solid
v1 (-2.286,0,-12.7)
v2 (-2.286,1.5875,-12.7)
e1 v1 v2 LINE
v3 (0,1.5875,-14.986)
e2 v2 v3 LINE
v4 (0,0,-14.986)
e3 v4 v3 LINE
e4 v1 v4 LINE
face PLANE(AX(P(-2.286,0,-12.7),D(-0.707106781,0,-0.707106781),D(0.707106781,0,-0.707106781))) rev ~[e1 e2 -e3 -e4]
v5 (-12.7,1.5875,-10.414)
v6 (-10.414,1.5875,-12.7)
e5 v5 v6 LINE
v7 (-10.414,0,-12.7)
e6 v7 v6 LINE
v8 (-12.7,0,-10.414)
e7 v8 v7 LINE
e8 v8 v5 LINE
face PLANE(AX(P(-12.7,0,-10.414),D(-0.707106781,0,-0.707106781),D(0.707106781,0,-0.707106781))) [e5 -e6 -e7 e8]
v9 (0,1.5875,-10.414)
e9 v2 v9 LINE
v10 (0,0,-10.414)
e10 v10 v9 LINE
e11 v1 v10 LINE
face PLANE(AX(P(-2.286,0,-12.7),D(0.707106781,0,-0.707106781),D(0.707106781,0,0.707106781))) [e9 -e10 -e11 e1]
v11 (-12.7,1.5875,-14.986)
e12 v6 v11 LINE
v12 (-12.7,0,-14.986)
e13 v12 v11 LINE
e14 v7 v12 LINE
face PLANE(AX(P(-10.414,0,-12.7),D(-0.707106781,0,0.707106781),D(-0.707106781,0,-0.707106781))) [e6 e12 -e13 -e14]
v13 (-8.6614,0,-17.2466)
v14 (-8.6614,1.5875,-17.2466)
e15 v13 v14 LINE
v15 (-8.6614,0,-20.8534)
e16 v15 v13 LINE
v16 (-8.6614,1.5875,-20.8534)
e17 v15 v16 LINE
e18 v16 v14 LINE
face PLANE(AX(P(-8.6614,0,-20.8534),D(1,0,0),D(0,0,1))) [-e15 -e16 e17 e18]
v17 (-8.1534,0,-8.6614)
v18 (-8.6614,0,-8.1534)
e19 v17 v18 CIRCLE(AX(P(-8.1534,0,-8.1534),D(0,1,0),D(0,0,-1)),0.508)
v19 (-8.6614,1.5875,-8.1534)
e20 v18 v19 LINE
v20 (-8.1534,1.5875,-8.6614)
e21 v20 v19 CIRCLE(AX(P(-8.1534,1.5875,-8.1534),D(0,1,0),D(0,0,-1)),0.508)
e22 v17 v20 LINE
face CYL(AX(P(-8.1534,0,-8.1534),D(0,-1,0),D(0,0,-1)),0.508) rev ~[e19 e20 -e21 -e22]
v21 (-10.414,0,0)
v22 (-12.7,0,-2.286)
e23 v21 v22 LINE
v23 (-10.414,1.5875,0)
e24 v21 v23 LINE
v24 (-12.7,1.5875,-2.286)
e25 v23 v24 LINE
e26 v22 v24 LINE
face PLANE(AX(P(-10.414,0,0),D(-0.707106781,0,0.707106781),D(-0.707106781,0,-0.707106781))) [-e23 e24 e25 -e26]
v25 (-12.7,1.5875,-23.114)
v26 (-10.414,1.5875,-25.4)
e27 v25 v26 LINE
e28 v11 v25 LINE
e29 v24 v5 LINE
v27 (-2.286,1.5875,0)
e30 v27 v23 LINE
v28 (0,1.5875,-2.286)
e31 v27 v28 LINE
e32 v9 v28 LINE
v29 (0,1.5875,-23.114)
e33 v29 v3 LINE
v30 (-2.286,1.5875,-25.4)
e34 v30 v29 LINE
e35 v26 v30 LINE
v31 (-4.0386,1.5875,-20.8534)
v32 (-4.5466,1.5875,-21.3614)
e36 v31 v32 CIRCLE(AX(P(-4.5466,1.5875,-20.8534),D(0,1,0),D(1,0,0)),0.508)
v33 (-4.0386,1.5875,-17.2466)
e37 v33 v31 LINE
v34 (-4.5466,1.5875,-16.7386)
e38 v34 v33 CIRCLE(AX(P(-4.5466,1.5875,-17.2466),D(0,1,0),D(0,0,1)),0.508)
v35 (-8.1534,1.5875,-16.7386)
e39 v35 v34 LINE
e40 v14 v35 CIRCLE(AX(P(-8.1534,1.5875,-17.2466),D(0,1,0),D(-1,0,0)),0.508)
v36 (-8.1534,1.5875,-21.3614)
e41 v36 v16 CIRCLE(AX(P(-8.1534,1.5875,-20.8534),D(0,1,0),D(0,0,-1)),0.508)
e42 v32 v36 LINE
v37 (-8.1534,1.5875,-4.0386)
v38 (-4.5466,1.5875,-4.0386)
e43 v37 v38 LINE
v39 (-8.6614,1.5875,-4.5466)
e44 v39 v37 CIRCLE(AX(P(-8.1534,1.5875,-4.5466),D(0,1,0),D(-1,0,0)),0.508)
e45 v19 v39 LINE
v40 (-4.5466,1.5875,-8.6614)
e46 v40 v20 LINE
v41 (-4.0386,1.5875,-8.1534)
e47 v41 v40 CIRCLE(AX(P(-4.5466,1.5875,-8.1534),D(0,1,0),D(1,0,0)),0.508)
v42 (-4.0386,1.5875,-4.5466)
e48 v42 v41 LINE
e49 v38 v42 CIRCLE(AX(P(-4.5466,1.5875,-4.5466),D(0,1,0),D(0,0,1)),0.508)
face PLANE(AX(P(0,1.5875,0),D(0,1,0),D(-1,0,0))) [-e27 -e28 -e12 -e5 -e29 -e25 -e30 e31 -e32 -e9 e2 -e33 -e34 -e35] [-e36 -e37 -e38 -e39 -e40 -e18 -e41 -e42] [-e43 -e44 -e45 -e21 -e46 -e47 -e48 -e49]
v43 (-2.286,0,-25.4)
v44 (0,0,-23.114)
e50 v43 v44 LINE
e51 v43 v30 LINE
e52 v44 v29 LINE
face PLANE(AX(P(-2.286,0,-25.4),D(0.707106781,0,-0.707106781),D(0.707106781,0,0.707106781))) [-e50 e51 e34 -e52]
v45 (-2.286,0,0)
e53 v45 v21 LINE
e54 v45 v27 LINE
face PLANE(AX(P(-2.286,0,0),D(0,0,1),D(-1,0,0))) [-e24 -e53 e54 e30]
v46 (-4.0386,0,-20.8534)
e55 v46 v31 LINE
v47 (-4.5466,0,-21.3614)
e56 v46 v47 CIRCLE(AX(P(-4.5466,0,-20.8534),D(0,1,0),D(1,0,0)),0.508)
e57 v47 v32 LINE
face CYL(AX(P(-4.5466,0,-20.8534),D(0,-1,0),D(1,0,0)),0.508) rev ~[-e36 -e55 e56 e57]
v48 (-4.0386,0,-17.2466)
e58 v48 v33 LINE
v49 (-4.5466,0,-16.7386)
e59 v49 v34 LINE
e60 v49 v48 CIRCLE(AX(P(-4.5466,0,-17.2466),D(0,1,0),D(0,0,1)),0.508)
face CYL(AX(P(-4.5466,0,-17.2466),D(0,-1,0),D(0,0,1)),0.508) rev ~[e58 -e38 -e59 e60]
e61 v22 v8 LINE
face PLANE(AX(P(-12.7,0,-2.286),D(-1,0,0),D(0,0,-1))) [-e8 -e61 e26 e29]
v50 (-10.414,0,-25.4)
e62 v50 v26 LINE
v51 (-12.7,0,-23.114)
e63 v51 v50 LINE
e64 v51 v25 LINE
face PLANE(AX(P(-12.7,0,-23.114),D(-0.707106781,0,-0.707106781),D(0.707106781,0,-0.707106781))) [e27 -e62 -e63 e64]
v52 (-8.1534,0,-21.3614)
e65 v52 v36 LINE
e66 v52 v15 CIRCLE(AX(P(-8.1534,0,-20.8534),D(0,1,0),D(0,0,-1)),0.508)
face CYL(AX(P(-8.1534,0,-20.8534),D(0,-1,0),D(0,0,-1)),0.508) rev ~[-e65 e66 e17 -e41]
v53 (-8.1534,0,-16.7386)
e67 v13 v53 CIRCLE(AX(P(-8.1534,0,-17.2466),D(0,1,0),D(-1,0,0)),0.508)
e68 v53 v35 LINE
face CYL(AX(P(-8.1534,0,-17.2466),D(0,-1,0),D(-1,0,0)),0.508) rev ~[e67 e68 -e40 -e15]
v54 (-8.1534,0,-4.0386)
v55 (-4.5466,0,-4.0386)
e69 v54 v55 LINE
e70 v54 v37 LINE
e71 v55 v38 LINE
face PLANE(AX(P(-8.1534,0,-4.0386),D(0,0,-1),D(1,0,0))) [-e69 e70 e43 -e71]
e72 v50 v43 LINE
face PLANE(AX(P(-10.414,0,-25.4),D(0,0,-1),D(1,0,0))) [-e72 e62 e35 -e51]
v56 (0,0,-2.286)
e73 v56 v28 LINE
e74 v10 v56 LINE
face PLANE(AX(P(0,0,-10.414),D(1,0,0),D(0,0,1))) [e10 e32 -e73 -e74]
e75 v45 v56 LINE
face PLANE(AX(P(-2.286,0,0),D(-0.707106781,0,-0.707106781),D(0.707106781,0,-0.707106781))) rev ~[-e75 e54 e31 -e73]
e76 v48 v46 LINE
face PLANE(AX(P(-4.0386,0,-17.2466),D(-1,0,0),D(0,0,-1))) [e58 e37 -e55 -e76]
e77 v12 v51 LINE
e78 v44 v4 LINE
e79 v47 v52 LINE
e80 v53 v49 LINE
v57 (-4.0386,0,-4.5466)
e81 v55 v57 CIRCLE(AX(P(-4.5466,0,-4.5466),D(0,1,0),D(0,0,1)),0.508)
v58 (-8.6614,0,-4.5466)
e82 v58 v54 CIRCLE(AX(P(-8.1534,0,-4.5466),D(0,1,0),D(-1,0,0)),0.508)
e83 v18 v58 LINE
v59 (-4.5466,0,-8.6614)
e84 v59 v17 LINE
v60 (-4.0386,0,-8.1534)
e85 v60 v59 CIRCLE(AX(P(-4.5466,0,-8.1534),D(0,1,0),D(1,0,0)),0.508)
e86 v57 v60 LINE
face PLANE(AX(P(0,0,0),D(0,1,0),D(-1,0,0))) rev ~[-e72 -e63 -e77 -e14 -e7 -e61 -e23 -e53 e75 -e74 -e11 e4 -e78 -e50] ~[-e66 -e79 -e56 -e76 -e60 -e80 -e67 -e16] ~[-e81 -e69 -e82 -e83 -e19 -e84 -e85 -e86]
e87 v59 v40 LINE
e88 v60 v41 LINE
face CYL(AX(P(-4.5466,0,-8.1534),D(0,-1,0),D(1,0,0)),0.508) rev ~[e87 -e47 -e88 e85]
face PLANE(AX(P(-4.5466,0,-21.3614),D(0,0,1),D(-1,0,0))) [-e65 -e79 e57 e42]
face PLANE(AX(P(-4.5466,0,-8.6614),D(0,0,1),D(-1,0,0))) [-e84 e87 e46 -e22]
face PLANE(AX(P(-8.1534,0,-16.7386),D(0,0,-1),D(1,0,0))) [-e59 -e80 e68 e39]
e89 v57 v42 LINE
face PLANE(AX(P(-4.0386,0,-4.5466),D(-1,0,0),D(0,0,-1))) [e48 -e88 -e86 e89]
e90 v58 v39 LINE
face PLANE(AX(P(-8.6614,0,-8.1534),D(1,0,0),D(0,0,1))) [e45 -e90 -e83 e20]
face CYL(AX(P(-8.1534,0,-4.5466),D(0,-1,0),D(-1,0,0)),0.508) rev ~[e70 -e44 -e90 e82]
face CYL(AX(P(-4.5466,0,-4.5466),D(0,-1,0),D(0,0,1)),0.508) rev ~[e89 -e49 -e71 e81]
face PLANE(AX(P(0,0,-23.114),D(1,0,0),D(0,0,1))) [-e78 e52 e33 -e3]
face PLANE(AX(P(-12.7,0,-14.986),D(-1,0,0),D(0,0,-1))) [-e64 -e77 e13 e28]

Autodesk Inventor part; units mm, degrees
ref_plane "YZ Plane" through (0, 0, 0) normal (1, 0, 0) x (0, 1, 0)
ref_plane "XZ Plane" through (0, 0, 0) normal (0, 1, 0) x (-1, 0, 0)
ref_plane "XY Plane" through (0, 0, 0) normal (0, 0, 1) x (1, 0, 0)
sketch "Sketch1" plane through (0, 0, 0) normal (0, 1, 0) x (-1, 0, 0)
  line L0 (2.286, 0) -> (10.414, 0)
  line L1 (12.7, -2.286) -> (12.7, -10.414)
  line L2 (10.414, -12.7) -> (2.286, -12.7)
  line L3 (0, -10.414) -> (0, -2.286)
  line L4 (8.1534, -4.0386) -> (4.5466, -4.0386)
  line L5 (4.0386, -4.5466) -> (4.0386, -8.1534)
  line L6 (4.5466, -8.6614) -> (8.1534, -8.6614)
  line L7 (8.6614, -8.1534) -> (8.6614, -4.5466)
  line L8 (10.414, 0) -> (12.7, -2.286)
  line L9 (12.7, -10.414) -> (10.414, -12.7)
  line L10 (2.286, -12.7) -> (0, -10.414)
  line L11 (2.286, 0) -> (0, -2.286)
  arc A0 (8.6614, -4.5466) -> (8.1534, -4.0386) centre (8.1534, -4.5466) ccw
  arc A1 (8.1534, -8.6614) -> (8.6614, -8.1534) centre (8.1534, -8.1534) ccw
  arc A2 (4.0386, -8.1534) -> (4.5466, -8.6614) centre (4.5466, -8.1534) ccw
  arc A3 (4.5466, -4.0386) -> (4.0386, -4.5466) centre (4.5466, -4.5466) ccw
  line L12 (8.1534, -4.5466) -> (4.5466, -8.1534) construction
  line L13 (12.7, -10.414) -> (0, -2.286) construction
  point P0 (0, 0)
  point P1 (12.7, -12.7)
  point P2 (12.7, 0)
  point P3 (0, -12.7)
  point P4 (4.0386, -8.6614)
  point P5 (8.6614, -8.6614)
  point P6 (6.35, -6.35)
  dimension "d1" = 12.7
  dimension "d2" = 4.6228
  dimension "d3" = 2.286
  dimension "d4" = 2.286
  dimension "d5" = 2.286
  dimension "d6" = 2.286
  dimension "d7" = 2.286
  dimension "d8" = 2.286
  dimension "d9" = 2.286
  dimension "d10" = 2.286
  dimension "d11" = 0.508
extrude "Body" add sketch "Sketch1" along normal blind 1.5875
sketch "Sketch2" plane through (0, 1.5875, 0) normal (0, 1, 0) x (1, 0, 0)
  arc A0 (-8.1534, 8.6614) -> (-8.6614, 8.1534) centre (-8.1534, 8.1534) ccw construction
  arc A1 (-4.5466, 4.0386) -> (-4.0386, 4.5466) centre (-4.5466, 4.5466) ccw construction
  circle A2 centre (-6.35, 6.35) radius 2.1844
  line L0 (-8.1534, 8.1534) -> (-4.5466, 4.5466) construction
  point P0 (0, 0)
  dimension "d14" = 4.3688
surface extrude "Circle" sketch "Sketch2" against normal up to surface (1.5875 mm away) shown yes curves A2
pattern_linear "Rectangular Pattern1" count 2 spacing 12.7 along (0, 0, -1) of "Body", "Circle"
equation "\"d4\" = d3"
equation "\"d5\" = d3"
equation "\"d6\" = d5"
equation "\"d7\" = d3"
equation "\"d8\" = d7"
equation "\"d9\" = d3"
equation "\"d10\" = d9"
equation "\"d22\" = d19"
equation "\"d19\" = 12.7"
